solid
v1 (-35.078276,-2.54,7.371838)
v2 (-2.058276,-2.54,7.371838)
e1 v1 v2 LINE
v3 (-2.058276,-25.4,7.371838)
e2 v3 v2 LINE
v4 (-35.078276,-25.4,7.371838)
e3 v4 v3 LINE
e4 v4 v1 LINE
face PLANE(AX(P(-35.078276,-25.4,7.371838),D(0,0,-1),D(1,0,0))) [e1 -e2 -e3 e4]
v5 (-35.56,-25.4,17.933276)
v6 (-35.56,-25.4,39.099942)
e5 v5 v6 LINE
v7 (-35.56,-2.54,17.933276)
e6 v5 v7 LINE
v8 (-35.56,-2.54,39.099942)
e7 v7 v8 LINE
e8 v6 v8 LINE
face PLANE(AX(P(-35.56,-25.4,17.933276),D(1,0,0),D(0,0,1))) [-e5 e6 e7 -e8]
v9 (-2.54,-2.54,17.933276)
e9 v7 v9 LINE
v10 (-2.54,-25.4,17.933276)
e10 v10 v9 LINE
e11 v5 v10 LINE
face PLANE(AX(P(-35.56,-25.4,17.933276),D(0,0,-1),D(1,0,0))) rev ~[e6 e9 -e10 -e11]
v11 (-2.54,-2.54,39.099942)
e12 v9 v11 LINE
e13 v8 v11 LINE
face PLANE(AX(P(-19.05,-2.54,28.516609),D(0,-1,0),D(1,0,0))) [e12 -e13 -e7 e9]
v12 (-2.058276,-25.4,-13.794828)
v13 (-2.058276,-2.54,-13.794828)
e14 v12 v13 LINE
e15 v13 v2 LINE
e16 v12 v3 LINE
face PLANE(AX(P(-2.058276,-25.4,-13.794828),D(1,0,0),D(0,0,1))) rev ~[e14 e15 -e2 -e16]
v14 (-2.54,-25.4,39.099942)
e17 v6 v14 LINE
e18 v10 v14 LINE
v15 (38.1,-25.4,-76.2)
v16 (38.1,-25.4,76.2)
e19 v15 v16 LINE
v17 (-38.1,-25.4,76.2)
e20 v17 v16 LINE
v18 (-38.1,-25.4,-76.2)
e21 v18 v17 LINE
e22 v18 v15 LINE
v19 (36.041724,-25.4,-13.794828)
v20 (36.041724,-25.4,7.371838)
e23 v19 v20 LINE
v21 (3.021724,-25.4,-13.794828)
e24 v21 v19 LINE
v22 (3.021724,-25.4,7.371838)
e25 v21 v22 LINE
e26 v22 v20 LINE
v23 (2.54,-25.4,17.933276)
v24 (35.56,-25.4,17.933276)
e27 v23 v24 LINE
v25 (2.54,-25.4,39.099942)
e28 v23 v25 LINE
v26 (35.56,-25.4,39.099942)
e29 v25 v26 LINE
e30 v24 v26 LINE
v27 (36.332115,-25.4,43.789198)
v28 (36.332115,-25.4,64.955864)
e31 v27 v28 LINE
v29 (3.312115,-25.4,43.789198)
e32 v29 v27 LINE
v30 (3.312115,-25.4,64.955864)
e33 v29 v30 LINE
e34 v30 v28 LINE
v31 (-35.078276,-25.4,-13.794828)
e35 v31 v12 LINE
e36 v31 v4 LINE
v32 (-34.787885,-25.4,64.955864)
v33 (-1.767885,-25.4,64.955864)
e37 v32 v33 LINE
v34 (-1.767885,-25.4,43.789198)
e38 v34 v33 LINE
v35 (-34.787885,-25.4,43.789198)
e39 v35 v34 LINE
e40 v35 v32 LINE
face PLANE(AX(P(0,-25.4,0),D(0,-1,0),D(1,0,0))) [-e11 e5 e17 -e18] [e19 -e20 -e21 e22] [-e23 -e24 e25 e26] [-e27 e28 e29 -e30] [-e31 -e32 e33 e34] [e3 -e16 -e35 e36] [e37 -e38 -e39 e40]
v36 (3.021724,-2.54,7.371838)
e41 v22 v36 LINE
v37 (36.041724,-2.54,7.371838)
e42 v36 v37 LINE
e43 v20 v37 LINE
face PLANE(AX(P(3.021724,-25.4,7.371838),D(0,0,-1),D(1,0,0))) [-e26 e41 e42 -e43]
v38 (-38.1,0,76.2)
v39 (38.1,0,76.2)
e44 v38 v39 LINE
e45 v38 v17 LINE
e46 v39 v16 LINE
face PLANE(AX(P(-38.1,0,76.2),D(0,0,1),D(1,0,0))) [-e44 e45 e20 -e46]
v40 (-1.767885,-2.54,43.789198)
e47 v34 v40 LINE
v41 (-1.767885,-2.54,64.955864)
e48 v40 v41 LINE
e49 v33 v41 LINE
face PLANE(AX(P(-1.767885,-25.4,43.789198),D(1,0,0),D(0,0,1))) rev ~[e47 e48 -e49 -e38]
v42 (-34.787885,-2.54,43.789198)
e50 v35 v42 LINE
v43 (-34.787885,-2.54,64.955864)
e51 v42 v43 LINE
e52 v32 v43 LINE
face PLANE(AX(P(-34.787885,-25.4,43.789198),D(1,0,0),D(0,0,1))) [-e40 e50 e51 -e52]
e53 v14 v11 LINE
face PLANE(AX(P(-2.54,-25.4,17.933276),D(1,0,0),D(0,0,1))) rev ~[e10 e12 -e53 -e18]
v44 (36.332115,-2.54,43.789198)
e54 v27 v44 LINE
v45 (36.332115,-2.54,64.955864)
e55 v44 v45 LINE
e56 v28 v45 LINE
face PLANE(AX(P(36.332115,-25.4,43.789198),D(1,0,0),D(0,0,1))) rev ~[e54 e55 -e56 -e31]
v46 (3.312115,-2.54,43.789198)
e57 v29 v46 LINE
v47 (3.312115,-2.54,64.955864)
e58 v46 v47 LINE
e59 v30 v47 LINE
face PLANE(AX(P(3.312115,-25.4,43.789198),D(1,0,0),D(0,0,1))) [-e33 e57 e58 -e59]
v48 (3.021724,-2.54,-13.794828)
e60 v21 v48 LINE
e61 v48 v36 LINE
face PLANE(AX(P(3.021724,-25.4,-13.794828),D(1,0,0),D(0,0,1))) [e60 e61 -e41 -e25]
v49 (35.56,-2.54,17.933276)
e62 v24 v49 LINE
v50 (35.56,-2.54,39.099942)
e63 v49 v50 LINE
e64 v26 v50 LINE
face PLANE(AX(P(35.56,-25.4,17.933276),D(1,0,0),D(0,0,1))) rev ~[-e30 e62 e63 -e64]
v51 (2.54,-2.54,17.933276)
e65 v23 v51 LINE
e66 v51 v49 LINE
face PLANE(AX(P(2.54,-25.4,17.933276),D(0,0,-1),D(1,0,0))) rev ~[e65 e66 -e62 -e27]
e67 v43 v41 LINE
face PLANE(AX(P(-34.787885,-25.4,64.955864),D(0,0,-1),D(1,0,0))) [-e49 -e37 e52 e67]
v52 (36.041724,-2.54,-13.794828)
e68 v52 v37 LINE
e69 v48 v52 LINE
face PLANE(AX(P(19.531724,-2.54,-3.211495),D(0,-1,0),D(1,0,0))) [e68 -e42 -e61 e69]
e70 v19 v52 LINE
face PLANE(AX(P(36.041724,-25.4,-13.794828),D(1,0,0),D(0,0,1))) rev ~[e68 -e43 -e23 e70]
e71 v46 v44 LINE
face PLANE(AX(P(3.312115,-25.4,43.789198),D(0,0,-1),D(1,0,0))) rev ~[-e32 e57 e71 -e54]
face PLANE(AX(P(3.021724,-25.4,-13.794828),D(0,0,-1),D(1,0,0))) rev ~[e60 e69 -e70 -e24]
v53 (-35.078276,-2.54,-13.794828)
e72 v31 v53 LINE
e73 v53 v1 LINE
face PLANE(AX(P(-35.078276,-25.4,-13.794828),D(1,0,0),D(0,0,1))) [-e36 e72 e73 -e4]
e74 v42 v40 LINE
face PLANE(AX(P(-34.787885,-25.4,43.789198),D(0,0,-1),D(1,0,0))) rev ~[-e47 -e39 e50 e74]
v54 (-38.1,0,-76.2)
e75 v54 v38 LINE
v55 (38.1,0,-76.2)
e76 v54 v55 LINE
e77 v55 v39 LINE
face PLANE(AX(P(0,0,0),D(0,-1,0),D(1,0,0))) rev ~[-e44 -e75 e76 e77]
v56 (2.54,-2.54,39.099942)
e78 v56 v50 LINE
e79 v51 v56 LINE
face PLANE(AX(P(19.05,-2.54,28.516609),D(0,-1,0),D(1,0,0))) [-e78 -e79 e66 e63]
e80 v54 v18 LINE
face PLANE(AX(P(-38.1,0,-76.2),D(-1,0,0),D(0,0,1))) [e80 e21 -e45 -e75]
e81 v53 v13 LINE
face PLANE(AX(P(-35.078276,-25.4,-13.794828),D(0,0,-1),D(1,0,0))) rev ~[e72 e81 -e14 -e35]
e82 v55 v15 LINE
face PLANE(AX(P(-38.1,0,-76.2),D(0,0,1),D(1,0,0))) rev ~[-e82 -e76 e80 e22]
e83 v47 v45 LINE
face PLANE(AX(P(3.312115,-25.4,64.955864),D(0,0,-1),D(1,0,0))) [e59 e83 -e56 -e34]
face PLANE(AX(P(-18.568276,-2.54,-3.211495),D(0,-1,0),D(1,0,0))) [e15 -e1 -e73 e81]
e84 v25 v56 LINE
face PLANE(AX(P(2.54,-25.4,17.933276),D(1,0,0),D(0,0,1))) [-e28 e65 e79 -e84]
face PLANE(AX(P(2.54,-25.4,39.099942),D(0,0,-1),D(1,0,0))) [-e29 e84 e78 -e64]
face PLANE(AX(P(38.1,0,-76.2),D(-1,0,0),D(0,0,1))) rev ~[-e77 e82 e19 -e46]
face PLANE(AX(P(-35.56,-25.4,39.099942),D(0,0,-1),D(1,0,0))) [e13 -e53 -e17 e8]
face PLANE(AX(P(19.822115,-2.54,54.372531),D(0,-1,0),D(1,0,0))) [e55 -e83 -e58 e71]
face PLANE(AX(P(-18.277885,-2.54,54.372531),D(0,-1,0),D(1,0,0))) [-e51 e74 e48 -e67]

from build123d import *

# Parameters (mm, degrees)
F0_W     = 76.2
F0_H     = 152.4
F1_DEPTH = 25.4
F2_W     = 33.02
F2_H     = 21.1666666667
F3_DEPTH = 22.86
F4_DEPTH = 22.86
F5_DEPTH = 22.86


# Not quite as in the source:
# - a feature names something its author has since deleted; it is built from what else it names


with BuildPart() as f1:
    # F0 (on Front) → F1 (new body)
    with BuildSketch(Plane.XZ):
        Rectangle(F0_W, F0_H)
    extrude(amount=F1_DEPTH)

    # F2 (on face) → F3 (cut)
    with BuildSketch(Plane.XZ.offset(25.4)):
        with Locations((-18.2778849706, 54.3725310351)):
            Rectangle(F2_W, F2_H)
    extrude(amount=-F3_DEPTH, mode=Mode.SUBTRACT)

    # F2 (on face) → F4 (cut)
    with BuildSketch(Plane.XZ.offset(25.4)):
        with Locations((19.8221150294, 54.3725310351)):
            Rectangle(F2_W, F2_H)
        with Locations((-19.05, 28.5166088839)):
            Rectangle(F2_W, F2_H)
        with Locations((-18.5682759488, -3.211494873)):
            Rectangle(F2_W, F2_H)
        with Locations((19.5317240512, -3.211494873)):
            Rectangle(F2_W, F2_H)
    extrude(amount=-F4_DEPTH, mode=Mode.SUBTRACT)

    # F2 (on face) → F5 (cut)
    with BuildSketch(Plane.XZ.offset(25.4)):
        with Locations((19.05, 28.5166088839)):
            Rectangle(F2_W, F2_H)
    extrude(amount=-F5_DEPTH, mode=Mode.SUBTRACT)


solid = f1.part
